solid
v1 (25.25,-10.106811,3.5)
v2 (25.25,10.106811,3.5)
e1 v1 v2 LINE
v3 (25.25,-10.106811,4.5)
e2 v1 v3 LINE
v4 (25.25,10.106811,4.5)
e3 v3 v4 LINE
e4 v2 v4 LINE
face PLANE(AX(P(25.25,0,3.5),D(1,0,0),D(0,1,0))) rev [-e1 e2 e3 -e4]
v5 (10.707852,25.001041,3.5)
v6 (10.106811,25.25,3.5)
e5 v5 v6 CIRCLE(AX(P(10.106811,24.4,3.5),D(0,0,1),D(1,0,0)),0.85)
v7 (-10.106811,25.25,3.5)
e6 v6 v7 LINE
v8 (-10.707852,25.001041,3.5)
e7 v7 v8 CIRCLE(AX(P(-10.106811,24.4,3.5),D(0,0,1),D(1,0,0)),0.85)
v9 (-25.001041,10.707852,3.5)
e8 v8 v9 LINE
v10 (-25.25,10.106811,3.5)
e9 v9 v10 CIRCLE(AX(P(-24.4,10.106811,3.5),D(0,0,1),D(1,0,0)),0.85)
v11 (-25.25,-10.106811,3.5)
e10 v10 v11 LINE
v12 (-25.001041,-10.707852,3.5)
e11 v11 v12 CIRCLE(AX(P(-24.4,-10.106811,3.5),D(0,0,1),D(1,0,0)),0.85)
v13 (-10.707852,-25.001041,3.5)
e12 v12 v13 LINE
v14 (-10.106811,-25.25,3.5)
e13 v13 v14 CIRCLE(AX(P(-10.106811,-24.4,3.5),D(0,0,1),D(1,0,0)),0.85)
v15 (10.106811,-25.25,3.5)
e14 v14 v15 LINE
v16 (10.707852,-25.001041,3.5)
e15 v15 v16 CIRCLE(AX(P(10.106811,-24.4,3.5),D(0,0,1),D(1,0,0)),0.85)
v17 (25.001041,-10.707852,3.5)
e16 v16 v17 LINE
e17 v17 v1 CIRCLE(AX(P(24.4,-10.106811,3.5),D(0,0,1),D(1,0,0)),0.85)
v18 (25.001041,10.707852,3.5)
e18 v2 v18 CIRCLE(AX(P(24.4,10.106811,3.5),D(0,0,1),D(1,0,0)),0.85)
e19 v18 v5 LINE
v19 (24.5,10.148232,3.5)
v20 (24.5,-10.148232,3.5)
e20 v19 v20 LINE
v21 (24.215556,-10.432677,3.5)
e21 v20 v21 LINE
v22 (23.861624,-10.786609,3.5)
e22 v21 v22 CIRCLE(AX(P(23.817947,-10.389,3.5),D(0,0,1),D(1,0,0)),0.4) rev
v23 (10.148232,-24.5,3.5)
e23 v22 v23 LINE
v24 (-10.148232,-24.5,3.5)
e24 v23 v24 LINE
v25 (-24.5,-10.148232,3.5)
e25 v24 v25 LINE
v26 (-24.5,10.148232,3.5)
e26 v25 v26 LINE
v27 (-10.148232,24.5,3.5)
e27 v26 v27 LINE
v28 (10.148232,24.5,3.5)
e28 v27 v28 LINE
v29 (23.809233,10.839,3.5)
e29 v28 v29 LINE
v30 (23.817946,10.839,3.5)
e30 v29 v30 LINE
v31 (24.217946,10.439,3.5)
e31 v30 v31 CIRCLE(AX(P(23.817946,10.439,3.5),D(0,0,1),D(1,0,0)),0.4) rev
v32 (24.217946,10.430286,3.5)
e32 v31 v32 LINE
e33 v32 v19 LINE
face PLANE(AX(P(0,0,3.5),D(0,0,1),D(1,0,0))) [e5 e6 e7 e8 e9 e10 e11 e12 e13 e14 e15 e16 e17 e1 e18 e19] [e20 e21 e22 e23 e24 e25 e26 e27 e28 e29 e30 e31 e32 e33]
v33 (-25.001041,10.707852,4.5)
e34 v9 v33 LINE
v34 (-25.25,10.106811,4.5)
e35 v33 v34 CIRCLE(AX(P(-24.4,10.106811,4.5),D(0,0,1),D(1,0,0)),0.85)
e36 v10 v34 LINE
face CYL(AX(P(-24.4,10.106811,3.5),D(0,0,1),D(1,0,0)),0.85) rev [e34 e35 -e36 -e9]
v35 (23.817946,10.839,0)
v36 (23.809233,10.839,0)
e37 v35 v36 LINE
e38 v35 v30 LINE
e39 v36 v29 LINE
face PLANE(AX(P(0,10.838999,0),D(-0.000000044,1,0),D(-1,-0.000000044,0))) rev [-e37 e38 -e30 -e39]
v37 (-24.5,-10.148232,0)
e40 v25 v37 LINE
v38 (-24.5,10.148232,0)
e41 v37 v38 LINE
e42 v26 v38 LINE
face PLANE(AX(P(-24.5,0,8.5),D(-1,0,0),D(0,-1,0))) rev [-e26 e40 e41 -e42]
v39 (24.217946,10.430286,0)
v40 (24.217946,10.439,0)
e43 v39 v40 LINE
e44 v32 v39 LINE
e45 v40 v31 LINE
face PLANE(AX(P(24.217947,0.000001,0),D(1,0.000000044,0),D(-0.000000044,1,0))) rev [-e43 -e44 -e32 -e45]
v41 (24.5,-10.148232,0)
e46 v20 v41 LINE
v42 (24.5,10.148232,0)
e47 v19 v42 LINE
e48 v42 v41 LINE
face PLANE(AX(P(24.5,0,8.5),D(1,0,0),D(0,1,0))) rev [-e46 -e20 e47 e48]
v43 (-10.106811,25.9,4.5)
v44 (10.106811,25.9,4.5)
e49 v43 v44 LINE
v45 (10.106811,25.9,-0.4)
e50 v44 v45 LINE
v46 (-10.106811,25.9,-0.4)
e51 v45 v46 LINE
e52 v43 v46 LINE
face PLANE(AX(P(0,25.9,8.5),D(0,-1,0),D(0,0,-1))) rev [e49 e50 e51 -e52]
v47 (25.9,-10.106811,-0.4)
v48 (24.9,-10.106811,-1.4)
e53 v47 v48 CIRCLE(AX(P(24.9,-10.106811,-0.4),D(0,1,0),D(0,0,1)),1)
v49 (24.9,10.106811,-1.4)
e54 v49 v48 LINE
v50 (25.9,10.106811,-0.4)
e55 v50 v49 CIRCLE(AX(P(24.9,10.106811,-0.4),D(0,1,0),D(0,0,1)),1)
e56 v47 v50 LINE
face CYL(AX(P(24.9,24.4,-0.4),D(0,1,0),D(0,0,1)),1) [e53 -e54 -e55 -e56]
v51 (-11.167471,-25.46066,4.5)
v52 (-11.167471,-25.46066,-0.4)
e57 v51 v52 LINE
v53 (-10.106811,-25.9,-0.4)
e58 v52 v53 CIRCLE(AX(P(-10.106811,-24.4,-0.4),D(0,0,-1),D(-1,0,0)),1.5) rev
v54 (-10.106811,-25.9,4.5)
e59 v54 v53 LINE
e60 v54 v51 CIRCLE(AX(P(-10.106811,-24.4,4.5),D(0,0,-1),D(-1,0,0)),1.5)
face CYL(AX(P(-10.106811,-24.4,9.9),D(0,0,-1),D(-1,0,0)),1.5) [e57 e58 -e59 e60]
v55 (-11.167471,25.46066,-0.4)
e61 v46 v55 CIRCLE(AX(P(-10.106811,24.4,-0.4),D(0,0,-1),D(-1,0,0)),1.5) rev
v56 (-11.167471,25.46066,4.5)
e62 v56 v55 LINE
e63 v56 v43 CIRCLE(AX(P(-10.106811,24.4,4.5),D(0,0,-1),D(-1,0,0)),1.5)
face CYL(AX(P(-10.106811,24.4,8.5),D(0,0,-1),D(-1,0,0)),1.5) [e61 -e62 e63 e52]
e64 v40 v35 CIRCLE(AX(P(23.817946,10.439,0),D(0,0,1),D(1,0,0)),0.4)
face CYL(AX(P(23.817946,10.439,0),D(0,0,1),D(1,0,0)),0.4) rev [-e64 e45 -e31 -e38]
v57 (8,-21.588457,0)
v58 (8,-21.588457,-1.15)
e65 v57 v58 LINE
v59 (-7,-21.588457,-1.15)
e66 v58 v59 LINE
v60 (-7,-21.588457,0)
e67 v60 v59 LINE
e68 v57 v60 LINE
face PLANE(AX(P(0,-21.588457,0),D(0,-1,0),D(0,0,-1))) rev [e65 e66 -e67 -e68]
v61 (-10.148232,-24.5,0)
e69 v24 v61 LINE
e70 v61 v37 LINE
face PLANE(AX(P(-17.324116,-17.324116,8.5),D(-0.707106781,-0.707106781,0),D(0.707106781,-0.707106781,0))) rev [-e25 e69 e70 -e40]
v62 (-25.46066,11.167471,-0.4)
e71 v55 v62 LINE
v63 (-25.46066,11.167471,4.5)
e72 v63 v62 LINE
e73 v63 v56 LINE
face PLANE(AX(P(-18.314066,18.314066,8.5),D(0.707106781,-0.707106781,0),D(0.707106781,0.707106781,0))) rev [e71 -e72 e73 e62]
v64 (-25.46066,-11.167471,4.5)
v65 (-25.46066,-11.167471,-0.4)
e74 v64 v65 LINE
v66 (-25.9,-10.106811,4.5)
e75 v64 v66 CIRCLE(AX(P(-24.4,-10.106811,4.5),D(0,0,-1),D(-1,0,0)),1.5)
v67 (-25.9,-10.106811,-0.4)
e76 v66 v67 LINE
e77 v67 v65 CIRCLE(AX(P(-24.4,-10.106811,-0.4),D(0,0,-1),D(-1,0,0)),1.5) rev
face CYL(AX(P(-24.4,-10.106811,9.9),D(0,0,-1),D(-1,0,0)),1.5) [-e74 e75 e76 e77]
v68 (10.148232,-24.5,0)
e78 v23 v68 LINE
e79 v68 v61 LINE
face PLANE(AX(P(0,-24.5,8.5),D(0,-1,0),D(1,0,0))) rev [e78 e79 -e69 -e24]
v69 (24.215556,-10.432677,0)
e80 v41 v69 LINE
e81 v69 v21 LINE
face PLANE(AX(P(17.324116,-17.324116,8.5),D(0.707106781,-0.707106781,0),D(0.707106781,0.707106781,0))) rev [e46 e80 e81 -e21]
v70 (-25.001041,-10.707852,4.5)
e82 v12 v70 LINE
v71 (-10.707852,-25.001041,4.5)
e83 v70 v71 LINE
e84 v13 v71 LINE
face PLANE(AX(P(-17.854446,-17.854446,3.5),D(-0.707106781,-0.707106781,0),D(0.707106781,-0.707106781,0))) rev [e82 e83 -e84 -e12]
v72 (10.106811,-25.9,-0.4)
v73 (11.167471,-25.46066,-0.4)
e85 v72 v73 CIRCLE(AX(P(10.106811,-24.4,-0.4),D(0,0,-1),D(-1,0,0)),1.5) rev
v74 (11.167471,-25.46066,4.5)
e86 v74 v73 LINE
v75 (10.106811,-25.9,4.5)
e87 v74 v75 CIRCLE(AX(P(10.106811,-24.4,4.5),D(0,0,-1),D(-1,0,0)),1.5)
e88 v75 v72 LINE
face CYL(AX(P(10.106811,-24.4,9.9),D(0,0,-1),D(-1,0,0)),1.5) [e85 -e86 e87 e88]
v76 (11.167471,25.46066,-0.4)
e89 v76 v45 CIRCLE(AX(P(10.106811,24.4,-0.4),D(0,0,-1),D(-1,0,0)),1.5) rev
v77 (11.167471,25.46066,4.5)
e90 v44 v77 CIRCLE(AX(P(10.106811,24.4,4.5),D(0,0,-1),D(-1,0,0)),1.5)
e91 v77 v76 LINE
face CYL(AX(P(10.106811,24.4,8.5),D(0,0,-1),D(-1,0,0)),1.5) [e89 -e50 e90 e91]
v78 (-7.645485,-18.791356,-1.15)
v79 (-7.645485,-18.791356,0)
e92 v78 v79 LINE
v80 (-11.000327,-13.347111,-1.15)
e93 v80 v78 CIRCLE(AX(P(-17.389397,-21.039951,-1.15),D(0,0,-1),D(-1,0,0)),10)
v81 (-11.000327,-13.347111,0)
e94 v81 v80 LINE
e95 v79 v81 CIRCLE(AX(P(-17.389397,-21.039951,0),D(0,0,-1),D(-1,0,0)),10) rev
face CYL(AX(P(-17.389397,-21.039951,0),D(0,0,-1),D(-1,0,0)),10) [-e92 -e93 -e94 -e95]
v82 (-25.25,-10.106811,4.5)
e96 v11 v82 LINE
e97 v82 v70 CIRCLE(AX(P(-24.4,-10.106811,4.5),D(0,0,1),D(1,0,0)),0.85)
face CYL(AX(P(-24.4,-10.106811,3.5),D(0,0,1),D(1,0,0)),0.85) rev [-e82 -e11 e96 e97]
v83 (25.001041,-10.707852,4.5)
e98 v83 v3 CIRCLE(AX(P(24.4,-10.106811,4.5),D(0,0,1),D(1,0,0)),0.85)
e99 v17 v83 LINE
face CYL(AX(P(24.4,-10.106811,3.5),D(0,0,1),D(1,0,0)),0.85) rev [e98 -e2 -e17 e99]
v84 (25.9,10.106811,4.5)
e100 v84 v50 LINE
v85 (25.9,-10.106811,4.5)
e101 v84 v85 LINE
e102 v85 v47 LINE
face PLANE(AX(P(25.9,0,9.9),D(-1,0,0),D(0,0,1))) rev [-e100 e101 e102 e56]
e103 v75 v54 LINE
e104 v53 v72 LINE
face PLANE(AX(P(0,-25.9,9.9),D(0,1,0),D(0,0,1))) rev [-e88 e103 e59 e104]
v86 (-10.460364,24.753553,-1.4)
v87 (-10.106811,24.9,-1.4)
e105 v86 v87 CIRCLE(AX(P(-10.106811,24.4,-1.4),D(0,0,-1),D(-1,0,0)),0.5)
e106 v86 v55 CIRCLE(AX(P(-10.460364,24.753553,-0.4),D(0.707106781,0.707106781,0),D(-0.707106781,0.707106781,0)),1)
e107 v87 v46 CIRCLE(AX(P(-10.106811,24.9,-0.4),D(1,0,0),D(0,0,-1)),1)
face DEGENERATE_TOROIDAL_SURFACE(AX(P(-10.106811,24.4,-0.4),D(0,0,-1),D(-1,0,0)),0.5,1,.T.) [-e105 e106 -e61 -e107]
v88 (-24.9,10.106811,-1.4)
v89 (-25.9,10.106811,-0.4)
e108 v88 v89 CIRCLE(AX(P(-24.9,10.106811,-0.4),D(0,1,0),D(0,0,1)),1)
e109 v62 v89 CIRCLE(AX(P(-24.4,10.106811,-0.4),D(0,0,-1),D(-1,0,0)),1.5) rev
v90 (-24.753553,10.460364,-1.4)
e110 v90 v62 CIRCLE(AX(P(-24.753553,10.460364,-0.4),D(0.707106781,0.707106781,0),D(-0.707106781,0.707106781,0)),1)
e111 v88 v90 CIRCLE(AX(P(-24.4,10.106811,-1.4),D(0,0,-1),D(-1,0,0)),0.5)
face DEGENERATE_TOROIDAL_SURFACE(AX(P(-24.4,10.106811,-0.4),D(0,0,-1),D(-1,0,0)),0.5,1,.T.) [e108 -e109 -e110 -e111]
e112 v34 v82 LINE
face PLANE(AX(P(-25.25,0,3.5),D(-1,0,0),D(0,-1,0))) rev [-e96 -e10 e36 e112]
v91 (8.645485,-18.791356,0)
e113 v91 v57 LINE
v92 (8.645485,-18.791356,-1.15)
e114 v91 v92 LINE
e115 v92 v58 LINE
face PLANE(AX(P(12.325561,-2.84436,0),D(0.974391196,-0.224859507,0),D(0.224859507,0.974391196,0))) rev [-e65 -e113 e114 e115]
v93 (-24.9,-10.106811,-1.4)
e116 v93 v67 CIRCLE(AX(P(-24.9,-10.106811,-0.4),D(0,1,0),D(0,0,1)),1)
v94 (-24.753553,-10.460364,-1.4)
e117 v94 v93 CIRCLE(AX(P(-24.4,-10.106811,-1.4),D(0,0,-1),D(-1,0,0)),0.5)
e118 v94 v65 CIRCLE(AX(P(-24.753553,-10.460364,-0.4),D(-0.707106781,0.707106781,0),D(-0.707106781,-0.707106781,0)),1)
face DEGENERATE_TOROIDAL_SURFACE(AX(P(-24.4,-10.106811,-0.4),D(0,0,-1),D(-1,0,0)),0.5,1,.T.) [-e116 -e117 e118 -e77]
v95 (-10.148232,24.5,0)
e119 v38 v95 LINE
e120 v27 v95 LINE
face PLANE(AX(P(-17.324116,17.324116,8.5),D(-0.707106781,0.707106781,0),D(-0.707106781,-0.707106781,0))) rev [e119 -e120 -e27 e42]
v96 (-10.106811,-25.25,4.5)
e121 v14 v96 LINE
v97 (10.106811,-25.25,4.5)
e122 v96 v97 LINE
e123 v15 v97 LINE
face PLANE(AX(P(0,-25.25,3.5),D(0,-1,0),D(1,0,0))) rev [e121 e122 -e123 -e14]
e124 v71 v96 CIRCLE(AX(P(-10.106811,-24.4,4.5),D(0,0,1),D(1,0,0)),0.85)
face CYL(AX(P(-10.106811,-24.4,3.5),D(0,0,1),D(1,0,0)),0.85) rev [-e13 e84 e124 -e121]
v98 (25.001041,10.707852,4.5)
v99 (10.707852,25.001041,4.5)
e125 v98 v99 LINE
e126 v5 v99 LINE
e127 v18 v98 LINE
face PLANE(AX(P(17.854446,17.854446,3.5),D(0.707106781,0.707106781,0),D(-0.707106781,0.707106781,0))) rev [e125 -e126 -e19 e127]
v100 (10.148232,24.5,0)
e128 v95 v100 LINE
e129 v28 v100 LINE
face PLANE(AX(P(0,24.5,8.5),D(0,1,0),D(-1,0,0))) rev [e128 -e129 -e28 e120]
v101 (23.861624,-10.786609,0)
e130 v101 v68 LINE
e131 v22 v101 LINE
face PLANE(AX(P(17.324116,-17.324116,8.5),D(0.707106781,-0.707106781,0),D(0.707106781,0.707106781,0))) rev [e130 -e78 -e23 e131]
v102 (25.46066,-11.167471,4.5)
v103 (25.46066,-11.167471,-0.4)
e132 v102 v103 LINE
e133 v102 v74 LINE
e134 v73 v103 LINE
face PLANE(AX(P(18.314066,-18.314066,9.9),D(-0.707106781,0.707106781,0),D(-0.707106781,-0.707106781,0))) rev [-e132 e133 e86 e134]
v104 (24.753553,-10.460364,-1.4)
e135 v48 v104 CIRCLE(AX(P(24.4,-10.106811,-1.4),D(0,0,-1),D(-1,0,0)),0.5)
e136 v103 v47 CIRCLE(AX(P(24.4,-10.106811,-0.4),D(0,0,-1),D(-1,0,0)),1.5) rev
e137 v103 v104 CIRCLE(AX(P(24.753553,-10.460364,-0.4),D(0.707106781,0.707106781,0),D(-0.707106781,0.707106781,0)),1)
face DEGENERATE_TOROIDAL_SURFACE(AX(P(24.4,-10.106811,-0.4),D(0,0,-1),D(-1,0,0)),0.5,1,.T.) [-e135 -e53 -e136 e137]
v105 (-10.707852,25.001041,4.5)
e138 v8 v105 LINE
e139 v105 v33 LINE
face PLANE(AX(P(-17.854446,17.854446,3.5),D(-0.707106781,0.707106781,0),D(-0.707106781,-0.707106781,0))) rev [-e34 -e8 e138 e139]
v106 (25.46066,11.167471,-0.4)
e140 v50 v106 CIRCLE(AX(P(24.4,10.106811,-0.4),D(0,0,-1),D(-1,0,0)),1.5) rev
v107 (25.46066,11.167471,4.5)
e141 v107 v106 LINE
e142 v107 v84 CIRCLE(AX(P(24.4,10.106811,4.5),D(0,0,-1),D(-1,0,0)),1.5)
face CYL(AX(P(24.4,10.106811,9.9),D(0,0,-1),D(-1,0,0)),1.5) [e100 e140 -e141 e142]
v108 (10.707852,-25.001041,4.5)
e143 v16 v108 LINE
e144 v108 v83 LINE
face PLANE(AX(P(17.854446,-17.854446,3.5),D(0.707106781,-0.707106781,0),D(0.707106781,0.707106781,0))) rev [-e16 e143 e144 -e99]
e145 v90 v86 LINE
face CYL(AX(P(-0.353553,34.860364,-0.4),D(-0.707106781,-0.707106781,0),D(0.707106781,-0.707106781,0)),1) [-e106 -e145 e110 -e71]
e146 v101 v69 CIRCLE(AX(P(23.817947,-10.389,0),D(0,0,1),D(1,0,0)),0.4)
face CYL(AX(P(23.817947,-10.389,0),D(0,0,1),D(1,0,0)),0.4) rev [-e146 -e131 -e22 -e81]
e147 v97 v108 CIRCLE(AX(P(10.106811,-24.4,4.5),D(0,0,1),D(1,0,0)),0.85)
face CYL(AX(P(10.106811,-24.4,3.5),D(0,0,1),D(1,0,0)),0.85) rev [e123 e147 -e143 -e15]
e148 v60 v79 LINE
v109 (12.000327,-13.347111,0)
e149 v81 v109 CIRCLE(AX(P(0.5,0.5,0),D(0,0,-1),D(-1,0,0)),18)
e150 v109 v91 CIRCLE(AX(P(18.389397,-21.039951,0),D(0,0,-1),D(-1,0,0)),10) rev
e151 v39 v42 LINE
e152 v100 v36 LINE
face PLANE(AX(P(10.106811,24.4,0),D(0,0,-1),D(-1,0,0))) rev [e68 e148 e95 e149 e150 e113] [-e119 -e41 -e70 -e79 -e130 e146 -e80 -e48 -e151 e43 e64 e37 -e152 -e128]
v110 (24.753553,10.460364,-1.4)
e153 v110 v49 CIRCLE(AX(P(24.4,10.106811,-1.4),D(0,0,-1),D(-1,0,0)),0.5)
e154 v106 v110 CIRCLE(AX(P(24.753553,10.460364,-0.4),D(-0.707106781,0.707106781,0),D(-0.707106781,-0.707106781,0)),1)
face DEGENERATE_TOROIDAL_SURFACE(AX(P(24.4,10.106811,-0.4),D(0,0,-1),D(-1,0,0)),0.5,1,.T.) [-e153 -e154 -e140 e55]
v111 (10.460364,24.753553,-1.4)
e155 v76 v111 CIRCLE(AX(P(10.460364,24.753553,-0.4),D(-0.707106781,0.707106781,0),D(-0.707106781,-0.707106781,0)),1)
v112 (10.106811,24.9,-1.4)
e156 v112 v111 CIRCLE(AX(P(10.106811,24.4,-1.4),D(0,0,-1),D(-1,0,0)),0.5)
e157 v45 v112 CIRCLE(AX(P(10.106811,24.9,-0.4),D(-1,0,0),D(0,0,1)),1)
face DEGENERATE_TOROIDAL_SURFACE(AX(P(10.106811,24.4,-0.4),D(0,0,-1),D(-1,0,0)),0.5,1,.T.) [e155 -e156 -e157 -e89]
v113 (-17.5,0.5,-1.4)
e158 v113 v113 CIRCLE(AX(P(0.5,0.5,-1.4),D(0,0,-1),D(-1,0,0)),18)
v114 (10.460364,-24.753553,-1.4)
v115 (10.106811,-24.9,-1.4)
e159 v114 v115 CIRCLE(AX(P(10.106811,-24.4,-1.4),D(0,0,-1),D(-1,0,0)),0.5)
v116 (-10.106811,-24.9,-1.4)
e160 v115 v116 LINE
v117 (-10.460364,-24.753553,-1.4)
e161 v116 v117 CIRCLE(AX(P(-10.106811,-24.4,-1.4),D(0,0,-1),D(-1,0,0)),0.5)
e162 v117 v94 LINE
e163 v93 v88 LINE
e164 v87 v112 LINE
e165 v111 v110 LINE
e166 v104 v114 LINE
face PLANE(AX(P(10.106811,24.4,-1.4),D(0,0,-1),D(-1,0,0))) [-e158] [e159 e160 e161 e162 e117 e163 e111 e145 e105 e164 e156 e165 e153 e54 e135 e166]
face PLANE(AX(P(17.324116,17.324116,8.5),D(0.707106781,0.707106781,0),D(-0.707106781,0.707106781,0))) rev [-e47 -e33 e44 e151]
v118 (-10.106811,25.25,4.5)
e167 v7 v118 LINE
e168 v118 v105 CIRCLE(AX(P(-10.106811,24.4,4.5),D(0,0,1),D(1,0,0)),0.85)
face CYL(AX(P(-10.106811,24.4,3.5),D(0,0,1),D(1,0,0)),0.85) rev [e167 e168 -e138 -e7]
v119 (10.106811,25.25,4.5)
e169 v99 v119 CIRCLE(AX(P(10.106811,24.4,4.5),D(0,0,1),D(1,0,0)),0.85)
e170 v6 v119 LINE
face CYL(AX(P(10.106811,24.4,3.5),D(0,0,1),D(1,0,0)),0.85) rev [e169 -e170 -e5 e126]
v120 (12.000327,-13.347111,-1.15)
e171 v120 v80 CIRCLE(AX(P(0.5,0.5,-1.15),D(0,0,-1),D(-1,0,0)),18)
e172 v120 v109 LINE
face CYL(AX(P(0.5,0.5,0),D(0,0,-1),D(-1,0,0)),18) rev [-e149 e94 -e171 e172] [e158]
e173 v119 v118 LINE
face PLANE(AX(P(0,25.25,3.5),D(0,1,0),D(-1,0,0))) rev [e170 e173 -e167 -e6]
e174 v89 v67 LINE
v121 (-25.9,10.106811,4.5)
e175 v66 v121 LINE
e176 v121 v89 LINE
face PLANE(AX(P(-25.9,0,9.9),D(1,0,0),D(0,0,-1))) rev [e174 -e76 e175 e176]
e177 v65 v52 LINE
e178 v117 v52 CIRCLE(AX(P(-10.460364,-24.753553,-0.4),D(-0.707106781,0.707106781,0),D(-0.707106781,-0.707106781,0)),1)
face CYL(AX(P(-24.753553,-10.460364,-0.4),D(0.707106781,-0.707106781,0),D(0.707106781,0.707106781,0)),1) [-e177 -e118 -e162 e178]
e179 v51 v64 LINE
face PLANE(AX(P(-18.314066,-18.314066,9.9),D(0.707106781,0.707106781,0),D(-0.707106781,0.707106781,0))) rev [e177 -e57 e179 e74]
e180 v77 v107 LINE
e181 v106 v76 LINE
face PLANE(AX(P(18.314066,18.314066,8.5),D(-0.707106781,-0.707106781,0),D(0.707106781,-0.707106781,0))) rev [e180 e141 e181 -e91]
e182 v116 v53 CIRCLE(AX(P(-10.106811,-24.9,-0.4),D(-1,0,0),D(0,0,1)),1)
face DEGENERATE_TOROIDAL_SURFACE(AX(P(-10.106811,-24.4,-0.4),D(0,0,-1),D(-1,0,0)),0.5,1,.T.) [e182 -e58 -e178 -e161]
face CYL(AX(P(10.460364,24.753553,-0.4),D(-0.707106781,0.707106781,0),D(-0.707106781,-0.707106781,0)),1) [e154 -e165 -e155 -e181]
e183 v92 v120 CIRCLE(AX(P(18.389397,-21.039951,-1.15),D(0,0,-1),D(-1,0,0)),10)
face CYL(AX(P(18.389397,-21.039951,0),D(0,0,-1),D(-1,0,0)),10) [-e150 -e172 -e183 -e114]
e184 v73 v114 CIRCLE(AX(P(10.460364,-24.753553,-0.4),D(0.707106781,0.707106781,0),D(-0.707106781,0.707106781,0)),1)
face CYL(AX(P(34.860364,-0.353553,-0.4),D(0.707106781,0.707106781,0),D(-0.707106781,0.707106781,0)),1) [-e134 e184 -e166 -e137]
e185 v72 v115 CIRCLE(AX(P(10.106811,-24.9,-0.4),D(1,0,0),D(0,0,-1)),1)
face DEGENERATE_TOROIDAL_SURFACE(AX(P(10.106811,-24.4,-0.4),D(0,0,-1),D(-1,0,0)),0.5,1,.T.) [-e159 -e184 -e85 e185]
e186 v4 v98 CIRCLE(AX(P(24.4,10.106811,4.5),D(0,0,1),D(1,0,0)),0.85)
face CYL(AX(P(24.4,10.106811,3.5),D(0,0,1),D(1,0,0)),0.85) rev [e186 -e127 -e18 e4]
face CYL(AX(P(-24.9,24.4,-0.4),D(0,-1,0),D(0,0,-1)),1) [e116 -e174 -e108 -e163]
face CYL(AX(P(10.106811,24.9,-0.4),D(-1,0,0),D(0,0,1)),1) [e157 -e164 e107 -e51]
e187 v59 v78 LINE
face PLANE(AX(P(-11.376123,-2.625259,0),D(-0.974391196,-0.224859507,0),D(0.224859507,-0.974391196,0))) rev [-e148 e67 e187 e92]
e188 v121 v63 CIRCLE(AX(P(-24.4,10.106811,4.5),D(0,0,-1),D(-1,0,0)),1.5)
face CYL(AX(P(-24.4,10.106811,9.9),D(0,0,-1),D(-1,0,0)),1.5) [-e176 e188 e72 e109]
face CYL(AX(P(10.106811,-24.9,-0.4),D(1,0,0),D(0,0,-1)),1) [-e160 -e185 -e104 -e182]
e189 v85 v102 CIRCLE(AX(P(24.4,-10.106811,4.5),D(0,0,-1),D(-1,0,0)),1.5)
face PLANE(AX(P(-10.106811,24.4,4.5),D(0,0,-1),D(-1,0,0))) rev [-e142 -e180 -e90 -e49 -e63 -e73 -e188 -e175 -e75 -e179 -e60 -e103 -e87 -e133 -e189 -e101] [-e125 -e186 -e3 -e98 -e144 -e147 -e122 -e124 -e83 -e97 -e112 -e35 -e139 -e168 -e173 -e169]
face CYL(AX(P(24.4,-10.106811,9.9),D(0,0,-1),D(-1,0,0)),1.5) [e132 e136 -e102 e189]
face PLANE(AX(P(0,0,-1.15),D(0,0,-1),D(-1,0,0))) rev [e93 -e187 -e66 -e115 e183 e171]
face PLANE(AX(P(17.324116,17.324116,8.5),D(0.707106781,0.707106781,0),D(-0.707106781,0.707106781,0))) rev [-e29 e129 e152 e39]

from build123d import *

# Parameters (mm, degrees)
BOSS_EXTRUDE1_DEPTH   = 8.5
BOSS_EXTRUDE1_2_DEPTH = 8.5
BOSS_EXTRUDE1_3_DEPTH = 8.5
BOSS_EXTRUDE1_4_DEPTH = 8.5
BOSS_EXTRUDE2_DEPTH   = 1.4
BOSS_EXTRUDE3_DEPTH   = 8.5
BOSS_EXTRUDE5_DEPTH   = 1
CUT_EXTRUDE1_DEPTH    = 38.942456431
CUT_EXTRUDE2_DEPTH    = 38.942456431
FILLET1_R             = 1
BOSS_EXTRUDE6_START   = 1.4
BOSS_EXTRUDE6_DEPTH   = 1.4
FILLET2_R             = 1
CUT_EXTRUDE3_DEPTH    = 1.4
BOSS_EXTRUDE7_DEPTH   = 0.25
FILLET3_R             = 10
CUT_EXTRUDE4_START    = -5.9
CUT_EXTRUDE4_DEPTH    = 6
CUT_EXTRUDE5_DEPTH    = 1


with BuildPart() as part:
    # Sketch1 → Boss-Extrude1 (new body)
    with BuildSketch(Plane.XY):
        with BuildLine():
            Line((25.9, -10.106810922), (25.9, 10.106810922))
            ThreePointArc((25.9, 10.106810922), (25.785819299, 10.68083607), (25.460660172, 11.167471094))
            Line((25.460660172, 11.167471094), (22.50588745, 14.122243815))
            Line((22.50588745, 14.122243815), (21.515937957, 13.132294321))
            Line((21.515937957, 13.132294321), (24.5, 10.148232278))
            Line((24.5, 10.148232278), (24.5, -10.148232278))
            Line((24.5, -10.148232278), (21.692714652, -12.955517626))
            Line((21.692714652, -12.955517626), (22.682664146, -13.94546712))
            Line((22.682664146, -13.94546712), (25.460660172, -11.167471094))
            ThreePointArc((25.460660172, -11.167471094), (25.785819299, -10.68083607), (25.9, -10.106810922))
        make_face()
    extrude(amount=BOSS_EXTRUDE1_DEPTH)



with BuildPart() as body_2:
    # Sketch1 → Boss-Extrude1 2 (new body)
    with BuildSketch(Plane.XY):
        with BuildLine():
            Line((-16.177281759, -20.450849507), (-11.167471094, -25.460660172))
            ThreePointArc((-11.167471094, -25.460660172), (-10.68083607, -25.785819299), (-10.106810922, -25.9))
            Line((-10.106810922, -25.9), (10.106810922, -25.9))
            ThreePointArc((10.106810922, -25.9), (10.68083607, -25.785819299), (11.167471094, -25.460660172))
            Line((11.167471094, -25.460660172), (15.611596334, -21.016534932))
            Line((15.611596334, -21.016534932), (14.62164684, -20.026585438))
            Line((14.62164684, -20.026585438), (10.148232278, -24.5))
            Line((10.148232278, -24.5), (-10.148232278, -24.5))
            Line((-10.148232278, -24.5), (-15.187332265, -19.460900013))
            Line((-15.187332265, -19.460900013), (-16.177281759, -20.450849507))
        make_face()
    extrude(amount=BOSS_EXTRUDE1_2_DEPTH)


with BuildPart() as body_3:
    # Sketch1 → Boss-Extrude1 3 (new body)
    with BuildSketch(Plane.XY):
        with BuildLine():
            Line((-22.116978721, 14.511152545), (-25.460660172, 11.167471094))
            ThreePointArc((-25.460660172, 11.167471094), (-25.785819299, 10.68083607), (-25.9, 10.106810922))
            Line((-25.9, 10.106810922), (-25.9, -10.106810922))
            ThreePointArc((-25.9, -10.106810922), (-25.785819299, -10.68083607), (-25.460660172, -11.167471094))
            Line((-25.460660172, -11.167471094), (-22.187689399, -14.440441867))
            Line((-22.187689399, -14.440441867), (-21.197739905, -13.450492373))
            Line((-21.197739905, -13.450492373), (-24.5, -10.148232278))
            Line((-24.5, -10.148232278), (-24.5, 10.148232278))
            Line((-24.5, 10.148232278), (-21.127029227, 13.521203051))
            Line((-21.127029227, 13.521203051), (-22.116978721, 14.511152545))
        make_face()
    extrude(amount=BOSS_EXTRUDE1_3_DEPTH)


with BuildPart() as body_4:
    # Sketch1 → Boss-Extrude1 4 (new body)
    with BuildSketch(Plane.XY):
        with BuildLine():
            Line((10.106810922, 25.9), (-10.106810922, 25.9))
            ThreePointArc((-10.106810922, 25.9), (-10.68083607, 25.785819299), (-11.167471094, 25.460660172))
            Line((-11.167471094, 25.460660172), (-17.520784643, 19.107346623))
            Line((-17.520784643, 19.107346623), (-16.530835149, 18.117397129))
            Line((-16.530835149, 18.117397129), (-10.148232278, 24.5))
            Line((-10.148232278, 24.5), (10.148232278, 24.5))
            Line((10.148232278, 24.5), (16.919743879, 17.728488399))
            Line((16.919743879, 17.728488399), (17.909693373, 18.718437893))
            Line((17.909693373, 18.718437893), (11.167471094, 25.460660172))
            ThreePointArc((11.167471094, 25.460660172), (10.68083607, 25.785819299), (10.106810922, 25.9))
        make_face()
    extrude(amount=BOSS_EXTRUDE1_4_DEPTH)


with BuildPart() as part_1:
    add(part.part)

    add(body_2.part)  # Boss-Extrude2 merges body 2

    add(body_3.part)  # Boss-Extrude2 merges body 3

    add(body_4.part)  # Boss-Extrude2 merges body 4
    # Sketch2 → Boss-Extrude2 (add)
    with BuildSketch(Plane.XY.offset(8.5)):
        with BuildLine():
            ThreePointArc((25.460660172, -11.167471094), (25.785819299, -10.68083607), (25.9, -10.106810922))
            Line((25.9, -10.106810922), (25.9, 10.106810922))
            ThreePointArc((25.9, 10.106810922), (25.785819299, 10.68083607), (25.460660172, 11.167471094))
            Line((25.460660172, 11.167471094), (11.167471094, 25.460660172))
            ThreePointArc((11.167471094, 25.460660172), (10.68083607, 25.785819299), (10.106810922, 25.9))
            Line((10.106810922, 25.9), (-10.106810922, 25.9))
            ThreePointArc((-10.106810922, 25.9), (-10.68083607, 25.785819299), (-11.167471094, 25.460660172))
            Line((-11.167471094, 25.460660172), (-25.460660172, 11.167471094))
            ThreePointArc((-25.460660172, 11.167471094), (-25.785819299, 10.68083607), (-25.9, 10.106810922))
            Line((-25.9, 10.106810922), (-25.9, -10.106810922))
            ThreePointArc((-25.9, -10.106810922), (-25.785819299, -10.68083607), (-25.460660172, -11.167471094))
            Line((-25.460660172, -11.167471094), (-11.167471094, -25.460660172))
            ThreePointArc((-11.167471094, -25.460660172), (-10.68083607, -25.785819299), (-10.106810922, -25.9))
            Line((-10.106810922, -25.9), (10.106810922, -25.9))
            ThreePointArc((10.106810922, -25.9), (10.68083607, -25.785819299), (11.167471094, -25.460660172))
            Line((11.167471094, -25.460660172), (25.460660172, -11.167471094))
        make_face()
    extrude(amount=BOSS_EXTRUDE2_DEPTH)

    # Sketch3 → Boss-Extrude3 (add)
    with BuildSketch(Plane(origin=(0, 0, 8.5), x_dir=(-1, 0, 0), z_dir=(0, 0, -1))):
        Polygon((-21.515937957, 13.132294321), (-16.919743879, 17.728488399), (-17.909693373, 18.718437893), (-22.50588745, 14.122243815), align=None)
        Polygon((21.127029227, 13.521203051), (16.530835149, 18.117397129), (17.520784643, 19.107346623), (22.116978721, 14.511152545), align=None)
        Polygon((-21.692714652, -12.955517626), (-22.682664146, -13.94546712), (-15.611596334, -21.016534932), (-14.62164684, -20.026585438), align=None)
        Polygon((15.187332265, -19.460900013), (16.177281759, -20.450849507), (22.187689399, -14.440441867), (21.197739905, -13.450492373), align=None)
    extrude(amount=BOSS_EXTRUDE3_DEPTH)

    # Sketch5 → Boss-Extrude5 (add)
    with BuildSketch(Plane(origin=(0, 0, 8.5), x_dir=(-1, 0, 0), z_dir=(0, 0, -1))):
        Polygon((16.177281759, -20.450849507), (22.187689399, -14.440441867), (21.197739905, -13.450492373), (15.187332265, -19.460900013), align=None)
    extrude(amount=BOSS_EXTRUDE5_DEPTH)

    # Sketch6 → Cut-Extrude1 (cut, through all)
    with BuildSketch(Plane.XY.offset(9.9)):
        with BuildLine():
            Line((-20.332854575, -10.39399953), (-20.332854823, 10.43400047))
            ThreePointArc((-20.332854823, 10.43400047), (-20.450012114, 10.716843181), (-20.732854828, 10.834000465))
            Line((-20.732854828, 10.834000465), (-23.272854828, 10.834000435))
            ThreePointArc((-23.272854828, 10.834000435), (-23.555697539, 10.716843144), (-23.672854823, 10.43400043))
            Line((-23.672854823, 10.43400043), (-23.672854575, -10.39399957))
            ThreePointArc((-23.672854575, -10.39399957), (-23.555697284, -10.676842281), (-23.27285457, -10.793999565))
            Line((-23.27285457, -10.793999565), (-20.73285457, -10.793999535))
            ThreePointArc((-20.73285457, -10.793999535), (-20.450011859, -10.676842244), (-20.332854575, -10.39399953))
        make_face()
        with BuildLine():
            Line((21.277947318, -10.789000444), (23.817947318, -10.789000333))
            ThreePointArc((23.817947318, -10.789000333), (24.100790025, -10.671843033), (24.217947301, -10.389000316))
            Line((24.217947301, -10.389000316), (24.21794639, 10.438999684))
            ThreePointArc((24.21794639, 10.438999684), (24.10078909, 10.721842391), (23.817946373, 10.838999667))
            Line((23.817946373, 10.838999667), (21.277946373, 10.838999556))
            ThreePointArc((21.277946373, 10.838999556), (20.995103665, 10.721842256), (20.87794639, 10.438999538))
            Line((20.87794639, 10.438999538), (20.877947301, -10.389000462))
            ThreePointArc((20.877947301, -10.389000462), (20.995104601, -10.671843169), (21.277947318, -10.789000444))
        make_face()
    extrude(amount=-CUT_EXTRUDE1_DEPTH, mode=Mode.SUBTRACT)

    # Sketch7 → Cut-Extrude2 (cut, through all)
    # profile 1 of 2: a face of its own
    with BuildSketch(Plane.XY.offset(9.9)):
        with BuildLine():
            ThreePointArc((-11.582455432, -19.595401386), (-11.465298194, -19.312558653), (-11.182455502, -19.195401316))
            Line((-11.182455502, -19.195401316), (11.677544498, -19.195397319))
            ThreePointArc((11.677544498, -19.195397319), (11.960387231, -19.312554557), (12.077544568, -19.595397249))
            Line((12.077544568, -19.595397249), (12.077545003, -22.084597249))
            ThreePointArc((12.077545003, -22.084597249), (11.960387765, -22.367439982), (11.677545073, -22.484597319))
            Line((11.677545073, -22.484597319), (9.391545073, -22.484597719))
            Line((9.391545073, -22.484597719), (-8.896454927, -22.484600916))
            Line((-8.896454927, -22.484600916), (-11.182454927, -22.484601316))
            ThreePointArc((-11.182454927, -22.484601316), (-11.46529766, -22.367444078), (-11.582454997, -22.084601386))
            Line((-11.582454997, -22.084601386), (-11.582455432, -19.595401386))
        make_face()
        Polygon((9.391545003, -22.084597719), (11.677545003, -22.084597319), (11.677544568, -19.595397319), (-11.182455432, -19.595401316), (-11.182454997, -22.084601316), (-8.896454997, -22.084600916), align=None, mode=Mode.SUBTRACT)
    # profile 2 of 2: a face of its own
    with BuildSketch(Plane.XY.offset(9.9)):
        Polygon((9.391545003, -22.084597719), (-8.896454997, -22.084600916), (-11.182454997, -22.084601316), (-11.182455432, -19.595401316), (11.677544568, -19.595397319), (11.677545003, -22.084597319), align=None)
    extrude(amount=-CUT_EXTRUDE2_DEPTH, mode=Mode.SUBTRACT)

    # Fillet1
    fillet1_edges = [part_1.edges().sort_by_distance(p)[0] for p in [
        (18.314065633, 18.314065633, 9.9),
        (10.68083607, 25.785819299, 9.9),
        (0, 25.9, 9.9),
        (-10.68083607, 25.785819299, 9.9),
        (-18.314065633, 18.314065633, 9.9),
        (-25.785819299, 10.68083607, 9.9),
        (-25.9, 0, 9.9),
        (-25.785819299, -10.68083607, 9.9),
        (-18.314065633, -18.314065633, 9.9),
        (-10.68083607, -25.785819299, 9.9),
        (0, -25.9, 9.9),
        (10.68083607, -25.785819299, 9.9),
        (18.314065633, -18.314065633, 9.9),
        (25.785819299, -10.68083607, 9.9),
        (25.9, 0, 9.9),
        (25.785819299, 10.68083607, 9.9),
    ]]
    fillet(fillet1_edges, radius=FILLET1_R)

    # Sketch8 → Boss-Extrude6 (add)
    with BuildSketch(Plane(origin=(0, 0, 0), x_dir=(-1, 0, 0), z_dir=(0, 0, -1)).offset(BOSS_EXTRUDE6_START)):
        with BuildLine():
            Line((-11.167471094, 25.460660172), (-25.460660172, 11.167471094))
            ThreePointArc((-25.460660172, 11.167471094), (-25.785819299, 10.68083607), (-25.9, 10.106810922))
            Line((-25.9, 10.106810922), (-25.9, -10.106810922))
            ThreePointArc((-25.9, -10.106810922), (-25.785819299, -10.68083607), (-25.460660172, -11.167471094))
            Line((-25.460660172, -11.167471094), (-11.167471094, -25.460660172))
            ThreePointArc((-11.167471094, -25.460660172), (-10.68083607, -25.785819299), (-10.106810922, -25.9))
            Line((-10.106810922, -25.9), (10.106810922, -25.9))
            ThreePointArc((10.106810922, -25.9), (10.68083607, -25.785819299), (11.167471094, -25.460660172))
            Line((11.167471094, -25.460660172), (25.460660172, -11.167471094))
            ThreePointArc((25.460660172, -11.167471094), (25.785819299, -10.68083607), (25.9, -10.106810922))
            Line((25.9, -10.106810922), (25.9, 10.106810922))
            ThreePointArc((25.9, 10.106810922), (25.785819299, 10.68083607), (25.460660172, 11.167471094))
            Line((25.460660172, 11.167471094), (11.167471094, 25.460660172))
            ThreePointArc((11.167471094, 25.460660172), (10.68083607, 25.785819299), (10.106810922, 25.9))
            Line((10.106810922, 25.9), (-10.106810922, 25.9))
            ThreePointArc((-10.106810922, 25.9), (-10.68083607, 25.785819299), (-11.167471094, 25.460660172))
        make_face()
    extrude(amount=-BOSS_EXTRUDE6_DEPTH)

    # Fillet2
    fillet2_edges = [part_1.edges().sort_by_distance(p)[0] for p in [
        (10.68083607, 25.785819299, -1.4),
        (18.314065633, 18.314065633, -1.4),
        (25.785819299, 10.68083607, -1.4),
        (25.9, 0, -1.4),
        (25.785819299, -10.68083607, -1.4),
        (18.314065633, -18.314065633, -1.4),
        (10.68083607, -25.785819299, -1.4),
        (0, -25.9, -1.4),
        (-10.68083607, -25.785819299, -1.4),
        (-18.314065633, -18.314065633, -1.4),
        (-25.785819299, -10.68083607, -1.4),
        (-25.9, 0, -1.4),
        (-25.785819299, 10.68083607, -1.4),
        (-18.314065633, 18.314065633, -1.4),
        (-10.68083607, 25.785819299, -1.4),
        (0, 25.9, -1.4),
    ]]
    fillet(fillet2_edges, radius=FILLET2_R)

    # Sketch9 → Cut-Extrude3 (cut)
    with BuildSketch(Plane(origin=(0, 0, -1.4), x_dir=(-1, 0, 0), z_dir=(0, 0, -1))):
        with BuildLine():
            ThreePointArc((17.5, 0.5), (-9.5, 16.088457268), (-9.5, -15.088457268))
            Line((-9.5, -15.088457268), (8.5, -15.088457268))
            ThreePointArc((8.5, -15.088457268), (15.088457268, -8.5), (17.5, 0.5))
        make_face()
        with BuildLine():
            Line((8.5, -15.088457268), (-9.5, -15.088457268))
            ThreePointArc((-9.5, -15.088457268), (-0.5, -17.5), (8.5, -15.088457268))
        make_face()
        with BuildLine():
            ThreePointArc((8.5, -15.088457268), (-0.5, -17.5), (-9.5, -15.088457268))
            Line((-9.5, -15.088457268), (-8, -21.588457268))
            Line((-8, -21.588457268), (7, -21.588457268))
            Line((7, -21.588457268), (8.5, -15.088457268))
        make_face()
    extrude(amount=-CUT_EXTRUDE3_DEPTH, mode=Mode.SUBTRACT)

    # Sketch9<3> → Boss-Extrude7 (add)
    with BuildSketch(Plane(origin=(0, 0, -1.4), x_dir=(-1, 0, 0), z_dir=(0, 0, -1))):
        with BuildLine():
            ThreePointArc((8.5, -15.088457268), (-0.5, -17.5), (-9.5, -15.088457268))
            Line((-9.5, -15.088457268), (-8, -21.588457268))
            Line((-8, -21.588457268), (7, -21.588457268))
            Line((7, -21.588457268), (8.5, -15.088457268))
        make_face()
    extrude(amount=-BOSS_EXTRUDE7_DEPTH)

    # Fillet3
    # the kernel refuses this fillet: 10 mm, written as the material it takes off along each edge
    with BuildSketch(Plane(origin=(9.5, -15.088457268, -1.15), x_dir=(0.8205991500669837, 0.5715041862570599, 0), z_dir=(0, 0, 1))) as fillet3_piece_1_section:
        with BuildLine():
            CenterArc((3.893328157, -9.964118034), FILLET3_R, 94.85518398, 37.295015249)
            Line((-2.817436219, -2.550236359), (0, 0))
            ThreePointArc((0, 0), (1.523476235, -0.064587539), (3.046952471, 0))
        make_face()
    fillet3_piece_1 = extrude(amount=10.650543516, mode=Mode.PRIVATE)
    fillet3_piece_1 = split(fillet3_piece_1, bisect_by=Plane(origin=(9.843769385, -15.549562691, 8.5), z_dir=(0, 0, -1)), keep=Keep.TOP, mode=Mode.PRIVATE)
    add(fillet3_piece_1, mode=Mode.SUBTRACT)
    with BuildSketch(Plane(origin=(-8.5, -15.088457268, -1.15), x_dir=(-0.8205991500669784, 0.5715041862570673, 0), z_dir=(0, 0, 1))) as fillet3_piece_2_section:
        with BuildLine():
            CenterArc((3.893328157, 9.964118034), FILLET3_R, 227.849800771, 37.295015249)
            Line((-2.817436219, 2.550236359), (0, 0))
            ThreePointArc((0, 0), (1.523476235, 0.064587539), (3.046952471, 0))
        make_face()
    fillet3_piece_2 = extrude(amount=10.650543516, mode=Mode.PRIVATE)
    fillet3_piece_2 = split(fillet3_piece_2, bisect_by=Plane(origin=(-8.843769385, -15.549562691, 8.5), z_dir=(0, 0, -1)), keep=Keep.TOP, mode=Mode.PRIVATE)
    add(fillet3_piece_2, mode=Mode.SUBTRACT)

    # Sketch10 → Cut-Extrude4 (cut)
    with BuildSketch(Plane(origin=(0, 0, -1.4), x_dir=(-1, 0, 0), z_dir=(0, 0, -1)).offset(CUT_EXTRUDE4_START)):
        with BuildLine():
            Line((-11.167471094, -25.460660172), (-25.460660172, -11.167471094))
            ThreePointArc((-25.460660172, -11.167471094), (-25.785819299, -10.68083607), (-25.9, -10.106810922))
            Line((-25.9, -10.106810922), (-25.9, 10.106810922))
            ThreePointArc((-25.9, 10.106810922), (-25.785819299, 10.68083607), (-25.460660172, 11.167471094))
            Line((-25.460660172, 11.167471094), (-11.167471094, 25.460660172))
            ThreePointArc((-11.167471094, 25.460660172), (-10.68083607, 25.785819299), (-10.106810922, 25.9))
            Line((-10.106810922, 25.9), (10.106810922, 25.9))
            ThreePointArc((10.106810922, 25.9), (10.68083607, 25.785819299), (11.167471094, 25.460660172))
            Line((11.167471094, 25.460660172), (25.460660172, 11.167471094))
            ThreePointArc((25.460660172, 11.167471094), (25.785819299, 10.68083607), (25.9, 10.106810922))
            Line((25.9, 10.106810922), (25.9, -10.106810922))
            ThreePointArc((25.9, -10.106810922), (25.785819299, -10.68083607), (25.460660172, -11.167471094))
            Line((25.460660172, -11.167471094), (11.167471094, -25.460660172))
            ThreePointArc((11.167471094, -25.460660172), (10.68083607, -25.785819299), (10.106810922, -25.9))
            Line((10.106810922, -25.9), (-10.106810922, -25.9))
            ThreePointArc((-10.106810922, -25.9), (-10.68083607, -25.785819299), (-11.167471094, -25.460660172))
        make_face()
    extrude(amount=-CUT_EXTRUDE4_DEPTH, mode=Mode.SUBTRACT)

    # Sketch11 → Cut-Extrude5 (cut)
    with BuildSketch(Plane.XY.offset(4.5)):
        with BuildLine():
            Line((10.106810922, 25.25), (-10.106810922, 25.25))
            ThreePointArc((-10.106810922, 25.25), (-10.432091839, 25.185297603), (-10.707851686, 25.001040764))
            Line((-10.707851686, 25.001040764), (-25.001040764, 10.707851686))
            ThreePointArc((-25.001040764, 10.707851686), (-25.185297603, 10.432091839), (-25.25, 10.106810922))
            Line((-25.25, 10.106810922), (-25.25, -10.106810922))
            ThreePointArc((-25.25, -10.106810922), (-25.185297603, -10.432091839), (-25.001040764, -10.707851686))
            Line((-25.001040764, -10.707851686), (-10.707851686, -25.001040764))
            ThreePointArc((-10.707851686, -25.001040764), (-10.432091839, -25.185297603), (-10.106810922, -25.25))
            Line((-10.106810922, -25.25), (10.106810922, -25.25))
            ThreePointArc((10.106810922, -25.25), (10.432091839, -25.185297603), (10.707851686, -25.001040764))
            Line((10.707851686, -25.001040764), (25.001040764, -10.707851686))
            ThreePointArc((25.001040764, -10.707851686), (25.185297603, -10.432091839), (25.25, -10.106810922))
            Line((25.25, -10.106810922), (25.25, 10.106810922))
            ThreePointArc((25.25, 10.106810922), (25.185297603, 10.432091839), (25.001040764, 10.707851686))
            Line((25.001040764, 10.707851686), (10.707851686, 25.001040764))
            ThreePointArc((10.707851686, 25.001040764), (10.432091839, 25.185297603), (10.106810922, 25.25))
        make_face()
        with BuildLine():
            Line((10.148232278, -24.5), (-10.148232278, -24.5))
            Line((-10.148232278, -24.5), (-24.5, -10.148232278))
            Line((-24.5, -10.148232278), (-24.5, 10.148232278))
            Line((-24.5, 10.148232278), (-10.148232278, 24.5))
            Line((-10.148232278, 24.5), (10.148232278, 24.5))
            Line((10.148232278, 24.5), (23.809232612, 10.838999666))
            Line((23.809232612, 10.838999666), (23.817946373, 10.838999667))
            ThreePointArc((23.817946373, 10.838999667), (24.10078909, 10.721842391), (24.21794639, 10.438999684))
            Line((24.21794639, 10.438999684), (24.217946391, 10.430285888))
            Line((24.217946391, 10.430285888), (24.5, 10.148232278))
            Line((24.5, 10.148232278), (24.5, -10.148232278))
            Line((24.5, -10.148232278), (24.215555624, -10.432676654))
            ThreePointArc((24.215555624, -10.432676654), (24.100790013, -10.671843046), (23.861623621, -10.786608657))
            Line((23.861623621, -10.786608657), (10.148232278, -24.5))
        make_face(mode=Mode.SUBTRACT)
    extrude(amount=-CUT_EXTRUDE5_DEPTH, mode=Mode.SUBTRACT)


solid = part_1.part
